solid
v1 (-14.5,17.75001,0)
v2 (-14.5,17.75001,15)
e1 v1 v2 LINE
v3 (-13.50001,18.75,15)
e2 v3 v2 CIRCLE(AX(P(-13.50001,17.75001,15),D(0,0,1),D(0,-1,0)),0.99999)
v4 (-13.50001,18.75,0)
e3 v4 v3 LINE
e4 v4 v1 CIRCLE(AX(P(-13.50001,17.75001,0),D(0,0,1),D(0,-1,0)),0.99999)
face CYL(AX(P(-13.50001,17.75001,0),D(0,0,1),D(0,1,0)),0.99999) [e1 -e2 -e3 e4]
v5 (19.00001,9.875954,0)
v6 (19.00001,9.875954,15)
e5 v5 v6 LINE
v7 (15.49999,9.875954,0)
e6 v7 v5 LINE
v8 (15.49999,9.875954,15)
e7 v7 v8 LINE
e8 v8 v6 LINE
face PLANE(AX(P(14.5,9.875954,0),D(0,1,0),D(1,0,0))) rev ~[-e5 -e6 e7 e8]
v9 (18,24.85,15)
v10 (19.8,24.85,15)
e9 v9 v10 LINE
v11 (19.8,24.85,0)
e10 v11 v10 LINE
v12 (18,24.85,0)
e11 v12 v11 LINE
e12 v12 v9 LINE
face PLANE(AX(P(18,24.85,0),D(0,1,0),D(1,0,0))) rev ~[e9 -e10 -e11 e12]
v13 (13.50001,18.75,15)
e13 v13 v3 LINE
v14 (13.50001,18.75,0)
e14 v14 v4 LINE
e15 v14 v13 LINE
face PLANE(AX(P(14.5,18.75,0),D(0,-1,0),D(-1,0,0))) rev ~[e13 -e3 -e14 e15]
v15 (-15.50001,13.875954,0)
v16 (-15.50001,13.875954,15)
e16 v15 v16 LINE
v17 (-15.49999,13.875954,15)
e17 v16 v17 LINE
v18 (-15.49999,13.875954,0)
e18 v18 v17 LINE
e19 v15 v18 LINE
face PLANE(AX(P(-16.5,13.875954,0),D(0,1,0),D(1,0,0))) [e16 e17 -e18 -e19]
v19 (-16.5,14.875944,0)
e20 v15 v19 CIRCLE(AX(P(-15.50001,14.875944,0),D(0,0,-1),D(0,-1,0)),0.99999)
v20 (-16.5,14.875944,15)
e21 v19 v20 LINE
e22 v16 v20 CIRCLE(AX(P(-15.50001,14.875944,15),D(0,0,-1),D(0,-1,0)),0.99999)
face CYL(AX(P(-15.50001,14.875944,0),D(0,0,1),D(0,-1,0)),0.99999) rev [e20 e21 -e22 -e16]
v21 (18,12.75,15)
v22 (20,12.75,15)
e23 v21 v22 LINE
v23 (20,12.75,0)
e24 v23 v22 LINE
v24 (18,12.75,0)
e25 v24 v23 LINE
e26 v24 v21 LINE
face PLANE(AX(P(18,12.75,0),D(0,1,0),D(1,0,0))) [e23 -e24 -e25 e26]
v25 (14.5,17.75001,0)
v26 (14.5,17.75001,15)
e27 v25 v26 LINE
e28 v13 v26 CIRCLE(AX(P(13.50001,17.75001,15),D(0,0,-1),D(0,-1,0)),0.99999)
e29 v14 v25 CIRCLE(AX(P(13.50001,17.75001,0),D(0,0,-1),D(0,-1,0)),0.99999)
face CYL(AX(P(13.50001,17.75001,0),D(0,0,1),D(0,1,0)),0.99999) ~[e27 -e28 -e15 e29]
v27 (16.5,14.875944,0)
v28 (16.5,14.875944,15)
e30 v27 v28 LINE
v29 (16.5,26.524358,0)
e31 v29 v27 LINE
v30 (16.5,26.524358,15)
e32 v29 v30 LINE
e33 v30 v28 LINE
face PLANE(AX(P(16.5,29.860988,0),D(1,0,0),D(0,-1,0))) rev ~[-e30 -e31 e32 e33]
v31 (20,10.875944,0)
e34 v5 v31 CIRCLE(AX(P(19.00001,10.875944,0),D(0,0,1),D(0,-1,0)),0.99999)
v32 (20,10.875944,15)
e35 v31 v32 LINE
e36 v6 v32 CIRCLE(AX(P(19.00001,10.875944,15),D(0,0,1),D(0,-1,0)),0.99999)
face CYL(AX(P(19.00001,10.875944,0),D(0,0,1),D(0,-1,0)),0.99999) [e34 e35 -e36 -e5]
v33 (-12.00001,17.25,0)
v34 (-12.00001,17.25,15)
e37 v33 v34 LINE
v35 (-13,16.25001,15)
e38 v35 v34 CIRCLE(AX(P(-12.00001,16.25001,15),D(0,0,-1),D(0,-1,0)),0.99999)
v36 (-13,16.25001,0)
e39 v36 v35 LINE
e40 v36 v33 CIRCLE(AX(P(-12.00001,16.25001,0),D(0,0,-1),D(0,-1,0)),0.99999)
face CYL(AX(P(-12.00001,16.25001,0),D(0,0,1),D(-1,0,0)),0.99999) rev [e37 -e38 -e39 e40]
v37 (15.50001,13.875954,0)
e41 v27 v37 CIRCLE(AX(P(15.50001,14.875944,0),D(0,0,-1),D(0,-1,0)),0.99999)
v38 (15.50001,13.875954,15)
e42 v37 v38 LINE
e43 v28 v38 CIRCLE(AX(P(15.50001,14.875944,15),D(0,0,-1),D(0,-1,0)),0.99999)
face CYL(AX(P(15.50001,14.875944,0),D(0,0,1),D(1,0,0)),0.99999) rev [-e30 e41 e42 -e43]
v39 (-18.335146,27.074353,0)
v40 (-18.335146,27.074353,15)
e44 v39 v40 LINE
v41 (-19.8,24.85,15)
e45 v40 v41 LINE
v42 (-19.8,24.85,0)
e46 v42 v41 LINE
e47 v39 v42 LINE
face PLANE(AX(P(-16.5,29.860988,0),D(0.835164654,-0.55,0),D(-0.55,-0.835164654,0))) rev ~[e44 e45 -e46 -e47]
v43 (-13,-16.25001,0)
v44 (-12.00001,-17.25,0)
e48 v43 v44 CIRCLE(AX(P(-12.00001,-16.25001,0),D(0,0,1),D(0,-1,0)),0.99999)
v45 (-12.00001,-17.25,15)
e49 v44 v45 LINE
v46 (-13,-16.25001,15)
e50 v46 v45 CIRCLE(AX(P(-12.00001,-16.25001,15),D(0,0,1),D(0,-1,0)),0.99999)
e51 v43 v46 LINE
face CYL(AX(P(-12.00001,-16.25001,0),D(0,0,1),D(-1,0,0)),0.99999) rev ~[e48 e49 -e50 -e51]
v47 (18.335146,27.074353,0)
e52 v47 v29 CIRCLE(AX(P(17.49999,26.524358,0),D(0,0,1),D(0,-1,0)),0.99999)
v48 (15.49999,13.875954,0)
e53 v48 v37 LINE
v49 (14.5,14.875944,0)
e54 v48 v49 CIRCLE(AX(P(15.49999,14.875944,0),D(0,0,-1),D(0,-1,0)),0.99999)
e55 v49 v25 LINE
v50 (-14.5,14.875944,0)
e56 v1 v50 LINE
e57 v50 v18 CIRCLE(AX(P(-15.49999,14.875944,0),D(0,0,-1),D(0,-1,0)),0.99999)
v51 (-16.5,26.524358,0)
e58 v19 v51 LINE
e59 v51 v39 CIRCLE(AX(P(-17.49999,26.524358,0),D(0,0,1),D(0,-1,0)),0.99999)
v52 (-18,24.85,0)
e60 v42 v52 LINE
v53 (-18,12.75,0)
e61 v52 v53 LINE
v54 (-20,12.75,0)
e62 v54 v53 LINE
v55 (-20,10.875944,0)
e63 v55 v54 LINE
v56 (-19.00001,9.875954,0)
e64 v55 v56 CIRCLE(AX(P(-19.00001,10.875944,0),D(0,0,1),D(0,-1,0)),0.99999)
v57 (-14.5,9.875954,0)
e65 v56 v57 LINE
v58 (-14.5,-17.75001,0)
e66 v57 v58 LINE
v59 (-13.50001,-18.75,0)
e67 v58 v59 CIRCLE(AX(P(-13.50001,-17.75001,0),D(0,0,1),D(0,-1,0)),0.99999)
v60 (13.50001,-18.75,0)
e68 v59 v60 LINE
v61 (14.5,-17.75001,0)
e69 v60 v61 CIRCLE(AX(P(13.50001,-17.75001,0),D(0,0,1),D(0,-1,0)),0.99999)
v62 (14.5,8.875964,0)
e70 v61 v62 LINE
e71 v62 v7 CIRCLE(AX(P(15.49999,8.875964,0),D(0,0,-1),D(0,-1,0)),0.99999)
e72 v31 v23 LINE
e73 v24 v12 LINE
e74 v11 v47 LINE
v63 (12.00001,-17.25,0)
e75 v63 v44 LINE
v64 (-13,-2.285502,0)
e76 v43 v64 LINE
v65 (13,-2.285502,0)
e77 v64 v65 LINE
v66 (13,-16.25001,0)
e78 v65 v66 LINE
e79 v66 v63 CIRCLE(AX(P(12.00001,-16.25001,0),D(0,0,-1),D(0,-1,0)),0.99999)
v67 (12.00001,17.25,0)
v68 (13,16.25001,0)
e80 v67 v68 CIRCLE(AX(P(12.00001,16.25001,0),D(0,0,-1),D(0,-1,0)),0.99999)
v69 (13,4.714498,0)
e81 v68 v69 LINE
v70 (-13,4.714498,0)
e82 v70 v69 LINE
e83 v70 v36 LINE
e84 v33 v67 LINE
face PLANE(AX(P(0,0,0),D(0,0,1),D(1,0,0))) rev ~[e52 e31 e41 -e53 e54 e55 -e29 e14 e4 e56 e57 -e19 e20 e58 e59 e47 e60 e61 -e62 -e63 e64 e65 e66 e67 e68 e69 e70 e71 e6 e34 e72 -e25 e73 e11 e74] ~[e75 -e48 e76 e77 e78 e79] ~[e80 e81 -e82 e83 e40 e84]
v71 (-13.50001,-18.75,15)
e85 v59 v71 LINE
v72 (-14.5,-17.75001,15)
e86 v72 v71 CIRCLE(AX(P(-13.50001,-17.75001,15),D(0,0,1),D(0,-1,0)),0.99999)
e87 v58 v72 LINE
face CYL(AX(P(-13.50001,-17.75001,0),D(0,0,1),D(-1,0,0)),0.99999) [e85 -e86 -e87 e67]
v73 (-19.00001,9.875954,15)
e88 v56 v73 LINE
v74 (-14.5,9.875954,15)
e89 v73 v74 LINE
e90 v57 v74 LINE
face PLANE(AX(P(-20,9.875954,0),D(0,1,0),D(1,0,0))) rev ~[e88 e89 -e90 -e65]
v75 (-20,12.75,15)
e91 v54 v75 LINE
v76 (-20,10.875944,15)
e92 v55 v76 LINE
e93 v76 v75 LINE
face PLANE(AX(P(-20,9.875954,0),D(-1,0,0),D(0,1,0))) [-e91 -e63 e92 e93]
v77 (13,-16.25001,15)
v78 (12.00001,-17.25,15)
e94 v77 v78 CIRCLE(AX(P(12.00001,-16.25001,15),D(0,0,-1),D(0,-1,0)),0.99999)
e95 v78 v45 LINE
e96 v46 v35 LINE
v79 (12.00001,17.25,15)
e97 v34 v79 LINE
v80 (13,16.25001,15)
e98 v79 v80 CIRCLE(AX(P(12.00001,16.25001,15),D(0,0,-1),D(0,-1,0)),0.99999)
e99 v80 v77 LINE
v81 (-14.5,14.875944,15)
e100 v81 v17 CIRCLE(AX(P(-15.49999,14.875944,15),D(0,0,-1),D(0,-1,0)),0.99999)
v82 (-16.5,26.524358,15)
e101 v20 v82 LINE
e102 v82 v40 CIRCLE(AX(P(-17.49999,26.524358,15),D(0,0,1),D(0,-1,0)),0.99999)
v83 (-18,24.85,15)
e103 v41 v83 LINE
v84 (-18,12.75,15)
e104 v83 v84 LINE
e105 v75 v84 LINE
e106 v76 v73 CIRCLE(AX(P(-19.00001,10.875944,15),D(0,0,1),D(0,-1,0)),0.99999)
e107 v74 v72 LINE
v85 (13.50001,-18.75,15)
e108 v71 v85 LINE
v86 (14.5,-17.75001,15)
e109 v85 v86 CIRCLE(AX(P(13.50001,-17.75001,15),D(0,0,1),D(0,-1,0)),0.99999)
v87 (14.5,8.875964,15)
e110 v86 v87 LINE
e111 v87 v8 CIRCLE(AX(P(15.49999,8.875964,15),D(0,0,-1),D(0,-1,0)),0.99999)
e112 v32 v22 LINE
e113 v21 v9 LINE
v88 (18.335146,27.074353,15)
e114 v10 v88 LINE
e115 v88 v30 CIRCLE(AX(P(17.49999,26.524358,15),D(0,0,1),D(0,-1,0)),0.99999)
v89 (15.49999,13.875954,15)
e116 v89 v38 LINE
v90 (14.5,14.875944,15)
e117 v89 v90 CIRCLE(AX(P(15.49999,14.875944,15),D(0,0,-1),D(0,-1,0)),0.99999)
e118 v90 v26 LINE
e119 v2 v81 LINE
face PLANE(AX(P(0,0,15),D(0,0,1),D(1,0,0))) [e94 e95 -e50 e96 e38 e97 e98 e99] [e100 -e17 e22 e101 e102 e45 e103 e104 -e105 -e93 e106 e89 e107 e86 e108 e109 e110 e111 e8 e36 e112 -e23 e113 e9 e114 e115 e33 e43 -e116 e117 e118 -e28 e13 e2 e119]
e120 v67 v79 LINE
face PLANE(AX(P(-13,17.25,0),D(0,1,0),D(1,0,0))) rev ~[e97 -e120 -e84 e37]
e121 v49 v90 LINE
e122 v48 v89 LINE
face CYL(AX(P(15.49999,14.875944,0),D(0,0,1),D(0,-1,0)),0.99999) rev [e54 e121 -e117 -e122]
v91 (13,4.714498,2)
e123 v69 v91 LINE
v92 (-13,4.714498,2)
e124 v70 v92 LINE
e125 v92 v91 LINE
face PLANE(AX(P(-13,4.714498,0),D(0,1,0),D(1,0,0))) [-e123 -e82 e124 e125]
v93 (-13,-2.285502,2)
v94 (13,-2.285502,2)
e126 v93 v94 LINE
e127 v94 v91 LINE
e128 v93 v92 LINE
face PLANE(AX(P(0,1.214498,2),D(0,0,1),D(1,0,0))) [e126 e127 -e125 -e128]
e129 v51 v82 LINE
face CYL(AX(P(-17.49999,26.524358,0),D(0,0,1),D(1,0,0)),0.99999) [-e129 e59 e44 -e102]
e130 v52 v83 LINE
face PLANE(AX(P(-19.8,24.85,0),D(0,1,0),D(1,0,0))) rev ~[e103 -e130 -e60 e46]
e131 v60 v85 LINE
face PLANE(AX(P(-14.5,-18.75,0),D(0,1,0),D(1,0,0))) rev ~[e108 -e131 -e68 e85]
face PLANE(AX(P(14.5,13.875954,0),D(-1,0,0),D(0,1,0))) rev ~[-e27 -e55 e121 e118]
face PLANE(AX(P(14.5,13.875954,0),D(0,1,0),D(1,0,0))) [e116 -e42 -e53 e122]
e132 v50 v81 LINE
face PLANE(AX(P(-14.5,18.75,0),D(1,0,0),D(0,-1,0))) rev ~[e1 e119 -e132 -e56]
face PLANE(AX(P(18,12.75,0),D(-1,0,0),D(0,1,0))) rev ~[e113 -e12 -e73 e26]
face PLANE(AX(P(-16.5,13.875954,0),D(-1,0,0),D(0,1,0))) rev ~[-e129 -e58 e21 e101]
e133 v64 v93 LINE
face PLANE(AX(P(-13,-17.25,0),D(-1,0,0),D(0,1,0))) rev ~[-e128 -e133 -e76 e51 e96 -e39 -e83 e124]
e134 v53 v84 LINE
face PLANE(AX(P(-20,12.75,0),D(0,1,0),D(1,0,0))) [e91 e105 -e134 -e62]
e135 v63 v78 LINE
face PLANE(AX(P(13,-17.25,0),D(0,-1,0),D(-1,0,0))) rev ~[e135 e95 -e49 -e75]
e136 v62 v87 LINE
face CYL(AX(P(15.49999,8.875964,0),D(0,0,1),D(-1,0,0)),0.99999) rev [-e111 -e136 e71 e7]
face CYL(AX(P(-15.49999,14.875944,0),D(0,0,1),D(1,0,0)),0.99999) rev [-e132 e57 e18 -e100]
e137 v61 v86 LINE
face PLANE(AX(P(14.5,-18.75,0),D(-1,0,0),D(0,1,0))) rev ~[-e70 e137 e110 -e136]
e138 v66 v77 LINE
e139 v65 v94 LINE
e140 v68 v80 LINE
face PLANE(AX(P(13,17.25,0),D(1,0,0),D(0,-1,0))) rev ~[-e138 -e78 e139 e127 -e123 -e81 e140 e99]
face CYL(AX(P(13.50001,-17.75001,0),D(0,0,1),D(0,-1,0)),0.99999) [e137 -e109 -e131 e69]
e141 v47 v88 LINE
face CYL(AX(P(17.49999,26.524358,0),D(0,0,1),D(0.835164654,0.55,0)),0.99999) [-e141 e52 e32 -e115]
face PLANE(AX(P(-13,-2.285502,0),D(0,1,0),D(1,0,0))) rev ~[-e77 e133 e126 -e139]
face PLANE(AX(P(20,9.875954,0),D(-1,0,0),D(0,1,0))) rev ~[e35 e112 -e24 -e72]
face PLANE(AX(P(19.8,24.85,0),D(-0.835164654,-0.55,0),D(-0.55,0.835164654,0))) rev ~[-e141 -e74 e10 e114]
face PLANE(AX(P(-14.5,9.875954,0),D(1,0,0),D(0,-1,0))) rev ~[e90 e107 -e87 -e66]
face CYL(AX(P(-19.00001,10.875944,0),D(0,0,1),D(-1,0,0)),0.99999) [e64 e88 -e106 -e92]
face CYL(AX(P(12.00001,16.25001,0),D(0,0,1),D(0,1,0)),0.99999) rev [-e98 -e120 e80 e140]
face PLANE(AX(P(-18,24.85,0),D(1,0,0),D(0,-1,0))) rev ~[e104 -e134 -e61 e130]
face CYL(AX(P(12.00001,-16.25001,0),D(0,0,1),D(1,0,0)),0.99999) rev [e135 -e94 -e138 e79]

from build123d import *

# Parameters (mm, degrees)
F0_W     = 2
F0_H     = 4
F0_H_2   = 2.8740456328
F1_DEPTH = 15
F2_R     = 0.99999
F0_W_2   = 26
F0_H_3   = 7
F3_DEPTH = 2


# Not quite as in the source:
# - a fillet or chamfer is up to 0.001 mm smaller than in the source, because OpenCascade refuses the exact size


with BuildPart() as f1:
    # F0 (on Top) → F1 (new body)
    with BuildSketch(Plane.XY):
        Polygon((14.5, 18.75), (-14.5, 18.75), (-14.5, 13.8759543672), (-14.5, 9.8759543672), (-14.5, -18.75), (14.5, -18.75), (14.5, 9.8759543672), (14.5, 13.8759543672), align=None)
        Polygon((-13, 4.7144976147), (-13, 17.25), (13, 17.25), (13, 4.7144976147), (13, -2.2855023853), (13, -17.25), (-13, -17.25), (-13, -2.2855023853), align=None, mode=Mode.SUBTRACT)
        with Locations((-15.5, 11.8759543672)):
            Rectangle(F0_W, F0_H)
        Polygon((-16.5, 9.8759543672), (-16.5, 13.8759543672), (-16.5, 29.8609879265), (-19.8, 24.85), (-18, 24.85), (-18, 12.75), (-18, 9.8759543672), align=None)
        with Locations((15.5, 11.8759543672)):
            Rectangle(F0_W, F0_H)
        Polygon((16.5, 29.8609879265), (16.5, 13.8759543672), (16.5, 9.8759543672), (18, 9.8759543672), (18, 12.75), (18, 24.85), (19.8, 24.85), align=None)
        with Locations((-19, 11.3129771836)):
            Rectangle(F0_W, F0_H_2)
        with Locations((19, 11.3129771836)):
            Rectangle(F0_W, F0_H_2)
    extrude(amount=F1_DEPTH)

    # F2 (radius 1 in the source; OpenCascade refuses exactly that, so slightly less here)
    f2_edges = [f1.edges().sort_by_distance(p)[0] for p in [
        (-14.5, 18.75, 7.5),
        (-20, 9.875954, 7.5),
        (14.5, 18.75, 7.5),
        (20, 9.875954, 7.5),
        (-13, 17.25, 7.5),
        (14.5, 9.875954, 7.5),
        (14.5, -18.75, 7.5),
        (-14.5, -18.75, 7.5),
        (-13, -17.25, 7.5),
        (13, 17.25, 7.5),
        (13, -17.25, 7.5),
        (-14.5, 13.875954, 7.5),
        (16.5, 13.875954, 7.5),
        (-16.5, 13.875954, 7.5),
        (14.5, 13.875954, 7.5),
        (-16.5, 29.860988, 7.5),
        (16.5, 29.860988, 7.5),
    ]]
    fillet(f2_edges, radius=F2_R)

    # F0 (on Top) → F3 (join)
    with BuildSketch(Plane.XY):
        with Locations((0, 1.2144976147)):
            Rectangle(F0_W_2, F0_H_3)
    extrude(amount=F3_DEPTH)


solid = f1.part
